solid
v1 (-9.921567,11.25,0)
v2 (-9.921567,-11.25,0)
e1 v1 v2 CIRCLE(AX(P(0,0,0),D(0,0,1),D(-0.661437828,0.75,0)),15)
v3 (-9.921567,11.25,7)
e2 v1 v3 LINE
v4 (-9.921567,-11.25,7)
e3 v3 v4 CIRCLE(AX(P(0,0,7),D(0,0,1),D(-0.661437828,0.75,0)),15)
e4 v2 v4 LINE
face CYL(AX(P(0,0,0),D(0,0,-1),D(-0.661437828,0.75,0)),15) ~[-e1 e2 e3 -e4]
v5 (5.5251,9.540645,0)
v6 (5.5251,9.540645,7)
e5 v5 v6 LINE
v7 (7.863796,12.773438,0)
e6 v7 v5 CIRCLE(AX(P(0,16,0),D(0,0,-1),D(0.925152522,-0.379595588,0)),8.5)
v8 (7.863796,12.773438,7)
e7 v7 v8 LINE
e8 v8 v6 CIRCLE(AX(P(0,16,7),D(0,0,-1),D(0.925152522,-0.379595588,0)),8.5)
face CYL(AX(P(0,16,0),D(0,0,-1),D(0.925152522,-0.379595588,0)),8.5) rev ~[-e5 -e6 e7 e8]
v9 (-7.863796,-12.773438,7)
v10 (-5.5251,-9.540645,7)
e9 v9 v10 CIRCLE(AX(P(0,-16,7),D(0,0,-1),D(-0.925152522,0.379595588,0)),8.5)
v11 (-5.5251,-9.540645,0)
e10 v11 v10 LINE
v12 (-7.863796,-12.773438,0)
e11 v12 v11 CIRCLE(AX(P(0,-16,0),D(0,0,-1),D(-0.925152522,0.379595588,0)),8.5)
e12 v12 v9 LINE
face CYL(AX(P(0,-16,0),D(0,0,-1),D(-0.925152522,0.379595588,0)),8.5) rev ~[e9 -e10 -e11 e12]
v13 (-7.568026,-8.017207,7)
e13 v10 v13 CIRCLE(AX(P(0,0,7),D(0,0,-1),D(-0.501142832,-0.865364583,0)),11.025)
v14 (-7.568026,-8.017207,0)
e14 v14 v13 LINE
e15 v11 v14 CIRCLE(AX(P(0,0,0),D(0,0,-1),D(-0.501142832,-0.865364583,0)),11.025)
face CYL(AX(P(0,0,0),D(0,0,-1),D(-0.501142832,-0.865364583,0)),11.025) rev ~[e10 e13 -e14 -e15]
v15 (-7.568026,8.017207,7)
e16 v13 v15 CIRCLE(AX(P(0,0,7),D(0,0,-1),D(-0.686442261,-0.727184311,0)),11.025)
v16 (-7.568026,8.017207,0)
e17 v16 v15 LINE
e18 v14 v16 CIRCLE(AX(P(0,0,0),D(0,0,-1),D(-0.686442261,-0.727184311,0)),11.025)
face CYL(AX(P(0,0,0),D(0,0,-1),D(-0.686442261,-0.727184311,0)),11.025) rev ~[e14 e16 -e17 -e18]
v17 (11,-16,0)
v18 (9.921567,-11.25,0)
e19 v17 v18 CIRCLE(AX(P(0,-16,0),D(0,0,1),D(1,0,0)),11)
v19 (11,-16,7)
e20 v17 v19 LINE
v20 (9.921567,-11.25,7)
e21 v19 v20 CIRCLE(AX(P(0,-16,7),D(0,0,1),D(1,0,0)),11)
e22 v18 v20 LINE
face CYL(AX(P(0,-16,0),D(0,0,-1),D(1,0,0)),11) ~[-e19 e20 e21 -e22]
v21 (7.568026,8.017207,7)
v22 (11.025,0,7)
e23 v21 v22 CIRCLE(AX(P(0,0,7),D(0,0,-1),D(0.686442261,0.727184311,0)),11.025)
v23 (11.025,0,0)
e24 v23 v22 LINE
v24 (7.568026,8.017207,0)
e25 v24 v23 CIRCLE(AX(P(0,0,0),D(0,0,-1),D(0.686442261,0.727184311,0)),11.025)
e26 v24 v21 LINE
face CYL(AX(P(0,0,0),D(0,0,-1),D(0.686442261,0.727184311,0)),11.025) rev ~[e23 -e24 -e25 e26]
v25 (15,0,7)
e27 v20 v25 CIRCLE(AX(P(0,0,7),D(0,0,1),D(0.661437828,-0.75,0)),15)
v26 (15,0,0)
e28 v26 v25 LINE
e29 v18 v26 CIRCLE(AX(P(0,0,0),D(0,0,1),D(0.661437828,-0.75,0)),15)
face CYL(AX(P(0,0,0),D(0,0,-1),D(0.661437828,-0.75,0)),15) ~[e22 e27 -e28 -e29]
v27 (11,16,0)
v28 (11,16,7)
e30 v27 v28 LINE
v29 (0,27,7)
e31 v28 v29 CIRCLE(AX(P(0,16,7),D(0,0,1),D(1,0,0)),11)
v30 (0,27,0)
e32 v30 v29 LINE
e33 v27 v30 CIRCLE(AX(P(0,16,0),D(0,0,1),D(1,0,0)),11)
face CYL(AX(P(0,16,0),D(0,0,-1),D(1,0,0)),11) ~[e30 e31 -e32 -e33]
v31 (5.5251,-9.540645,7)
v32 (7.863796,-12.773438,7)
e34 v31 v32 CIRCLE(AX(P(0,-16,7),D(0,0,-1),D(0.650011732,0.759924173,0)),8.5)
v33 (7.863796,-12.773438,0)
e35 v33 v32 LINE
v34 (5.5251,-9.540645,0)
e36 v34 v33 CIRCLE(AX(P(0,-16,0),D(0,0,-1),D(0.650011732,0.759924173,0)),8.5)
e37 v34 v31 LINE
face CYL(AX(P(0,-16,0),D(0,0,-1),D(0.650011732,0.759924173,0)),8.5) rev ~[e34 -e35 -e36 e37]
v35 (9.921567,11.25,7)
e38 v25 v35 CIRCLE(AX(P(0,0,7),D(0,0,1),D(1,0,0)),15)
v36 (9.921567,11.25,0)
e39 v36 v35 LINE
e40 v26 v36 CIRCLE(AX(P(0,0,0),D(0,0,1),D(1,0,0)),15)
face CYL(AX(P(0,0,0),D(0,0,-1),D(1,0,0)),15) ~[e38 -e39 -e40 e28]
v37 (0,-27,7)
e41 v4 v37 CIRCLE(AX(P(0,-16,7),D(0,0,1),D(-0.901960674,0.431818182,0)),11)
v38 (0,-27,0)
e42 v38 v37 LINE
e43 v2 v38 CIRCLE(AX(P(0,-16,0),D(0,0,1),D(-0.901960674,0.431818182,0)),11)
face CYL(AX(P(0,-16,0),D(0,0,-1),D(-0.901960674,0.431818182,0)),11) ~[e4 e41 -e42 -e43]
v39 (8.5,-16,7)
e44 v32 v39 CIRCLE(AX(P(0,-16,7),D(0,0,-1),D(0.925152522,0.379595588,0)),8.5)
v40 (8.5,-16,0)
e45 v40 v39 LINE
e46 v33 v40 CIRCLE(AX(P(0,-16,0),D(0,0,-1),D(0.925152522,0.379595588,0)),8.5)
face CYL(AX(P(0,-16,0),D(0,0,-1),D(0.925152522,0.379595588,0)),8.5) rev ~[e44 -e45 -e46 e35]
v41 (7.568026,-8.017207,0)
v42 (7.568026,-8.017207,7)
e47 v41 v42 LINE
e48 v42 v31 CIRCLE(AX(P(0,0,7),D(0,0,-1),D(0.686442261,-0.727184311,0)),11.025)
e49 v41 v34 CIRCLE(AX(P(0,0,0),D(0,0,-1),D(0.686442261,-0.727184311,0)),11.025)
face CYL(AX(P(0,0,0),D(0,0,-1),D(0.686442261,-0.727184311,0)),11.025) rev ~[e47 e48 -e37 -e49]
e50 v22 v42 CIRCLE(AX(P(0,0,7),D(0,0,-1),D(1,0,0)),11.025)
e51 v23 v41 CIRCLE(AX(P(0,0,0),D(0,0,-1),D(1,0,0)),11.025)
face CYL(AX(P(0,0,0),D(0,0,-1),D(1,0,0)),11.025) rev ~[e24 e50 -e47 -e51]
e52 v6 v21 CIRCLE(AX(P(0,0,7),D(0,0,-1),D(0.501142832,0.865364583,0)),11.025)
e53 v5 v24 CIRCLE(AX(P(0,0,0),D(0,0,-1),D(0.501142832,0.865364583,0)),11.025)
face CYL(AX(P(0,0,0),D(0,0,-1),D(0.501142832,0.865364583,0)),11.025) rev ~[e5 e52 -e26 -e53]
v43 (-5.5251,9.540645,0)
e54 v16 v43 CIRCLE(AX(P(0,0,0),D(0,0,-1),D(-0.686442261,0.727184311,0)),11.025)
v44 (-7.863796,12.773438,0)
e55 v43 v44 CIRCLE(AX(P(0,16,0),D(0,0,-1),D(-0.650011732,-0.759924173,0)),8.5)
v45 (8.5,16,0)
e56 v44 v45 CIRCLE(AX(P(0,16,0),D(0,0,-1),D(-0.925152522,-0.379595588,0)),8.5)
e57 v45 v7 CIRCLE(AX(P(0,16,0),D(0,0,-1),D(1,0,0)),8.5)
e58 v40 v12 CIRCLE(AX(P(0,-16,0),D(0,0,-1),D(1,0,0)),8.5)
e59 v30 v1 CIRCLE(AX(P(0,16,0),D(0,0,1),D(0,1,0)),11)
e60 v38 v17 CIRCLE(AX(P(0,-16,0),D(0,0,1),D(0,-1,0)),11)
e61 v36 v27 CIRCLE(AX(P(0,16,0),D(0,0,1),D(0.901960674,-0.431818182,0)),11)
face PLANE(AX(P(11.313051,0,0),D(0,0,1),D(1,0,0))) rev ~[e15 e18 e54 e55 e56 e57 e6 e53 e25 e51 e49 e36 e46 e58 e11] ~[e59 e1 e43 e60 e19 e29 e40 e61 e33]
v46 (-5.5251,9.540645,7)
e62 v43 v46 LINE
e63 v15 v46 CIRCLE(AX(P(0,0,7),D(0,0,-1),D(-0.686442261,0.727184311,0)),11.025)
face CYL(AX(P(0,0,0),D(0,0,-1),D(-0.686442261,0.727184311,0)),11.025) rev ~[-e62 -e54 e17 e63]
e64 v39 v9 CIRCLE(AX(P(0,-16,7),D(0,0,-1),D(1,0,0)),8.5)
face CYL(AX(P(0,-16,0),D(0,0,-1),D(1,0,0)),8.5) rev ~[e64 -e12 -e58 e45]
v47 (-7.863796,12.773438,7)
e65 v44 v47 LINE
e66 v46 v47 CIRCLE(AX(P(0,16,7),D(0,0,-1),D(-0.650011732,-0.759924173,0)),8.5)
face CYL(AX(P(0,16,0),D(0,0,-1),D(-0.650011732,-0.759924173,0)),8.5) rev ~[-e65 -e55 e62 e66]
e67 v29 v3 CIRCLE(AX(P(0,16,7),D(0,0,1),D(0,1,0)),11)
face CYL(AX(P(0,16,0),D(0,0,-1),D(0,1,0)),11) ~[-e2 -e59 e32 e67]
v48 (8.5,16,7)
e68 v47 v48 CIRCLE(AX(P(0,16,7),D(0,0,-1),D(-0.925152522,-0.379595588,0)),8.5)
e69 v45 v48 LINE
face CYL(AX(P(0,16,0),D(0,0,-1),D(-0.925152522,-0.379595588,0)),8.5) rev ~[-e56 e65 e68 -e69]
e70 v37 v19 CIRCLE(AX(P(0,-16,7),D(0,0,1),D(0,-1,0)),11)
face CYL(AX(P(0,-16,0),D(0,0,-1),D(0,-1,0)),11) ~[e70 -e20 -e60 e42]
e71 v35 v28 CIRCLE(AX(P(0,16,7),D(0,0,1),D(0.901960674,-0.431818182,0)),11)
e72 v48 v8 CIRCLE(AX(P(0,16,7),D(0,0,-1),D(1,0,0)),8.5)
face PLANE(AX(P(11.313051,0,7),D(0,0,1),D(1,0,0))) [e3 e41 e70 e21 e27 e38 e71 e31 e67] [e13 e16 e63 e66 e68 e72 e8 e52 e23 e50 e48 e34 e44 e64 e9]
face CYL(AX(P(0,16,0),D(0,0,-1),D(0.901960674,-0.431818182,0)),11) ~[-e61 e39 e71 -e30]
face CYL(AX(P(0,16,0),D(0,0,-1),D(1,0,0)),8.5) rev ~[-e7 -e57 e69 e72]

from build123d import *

# Parameters (mm, degrees)
F1_DEPTH = 7


with BuildPart() as f1:
    # F0 (on Top) → F1 (new body)
    with BuildSketch(Plane.XY):
        with BuildLine():
            ThreePointArc((7.5680259261, 8.0172070312), (10.1239347794, 4.3653830969), (11.025, 0))
            ThreePointArc((11.025, 0), (10.1239347794, -4.3653830969), (7.5680259261, -8.0172070312))
            ThreePointArc((7.5680259261, -8.0172070313), (8.8929301367, -9.5257592273), (9.9215674165, -11.25))
            ThreePointArc((9.9215674165, -11.25), (13.6715674165, -6.1715674165), (15, 0))
            ThreePointArc((15, 0), (13.6715674165, 6.1715674165), (9.9215674165, 11.25))
            ThreePointArc((9.9215674165, 11.25), (8.8929301367, 9.5257592273), (7.5680259261, 8.0172070312))
        make_face()
        with BuildLine():
            ThreePointArc((5.5250997211, 9.5406445313), (6.5907283556, 8.8381516587), (7.5680259261, 8.0172070312))
            ThreePointArc((7.5680259261, 8.0172070312), (8.8929301367, 9.5257592273), (9.9215674165, 11.25))
            ThreePointArc((9.9215674165, 11.25), (8.9252455049, 12.0557037405), (7.863796439, 12.7734375))
            ThreePointArc((7.863796439, 12.7734375), (6.8868260245, 11.0178691999), (5.5250997211, 9.5406445312))
        make_face()
        with BuildLine():
            ThreePointArc((9.9215674165, -11.25), (8.8929301367, -9.5257592273), (7.5680259261, -8.0172070313))
            ThreePointArc((7.5680259261, -8.0172070312), (6.5907283556, -8.8381516587), (5.5250997211, -9.5406445313))
            ThreePointArc((5.5250997211, -9.5406445312), (6.8868260245, -11.0178691999), (7.863796439, -12.7734375))
            ThreePointArc((7.863796439, -12.7734375), (8.9252455049, -12.0557037405), (9.9215674165, -11.25))
        make_face()
        with BuildLine():
            ThreePointArc((7.863796439, 12.7734375), (8.9252455049, 12.0557037405), (9.9215674165, 11.25))
            ThreePointArc((9.9215674165, 11.25), (10.7270042785, 13.5645576974), (11, 16))
            ThreePointArc((11, 16), (7.7781745931, 23.7781745931), (0, 27))
            Line((0, 27), (0, 24.5))
            ThreePointArc((0, 24.5), (6.0104076401, 22.0104076401), (8.5, 16))
            ThreePointArc((8.5, 16), (8.3394325266, 14.3556566252), (7.863796439, 12.7734375))
        make_face()
        with BuildLine():
            ThreePointArc((11, -16), (10.7270042785, -13.5645576974), (9.9215674165, -11.25))
            ThreePointArc((9.9215674165, -11.25), (8.9252455049, -12.0557037405), (7.863796439, -12.7734375))
            ThreePointArc((7.863796439, -12.7734375), (8.3394325266, -14.3556566252), (8.5, -16))
            ThreePointArc((8.5, -16), (6.0104076401, -22.0104076401), (0, -24.5))
            Line((0, -24.5), (0, -27))
            ThreePointArc((0, -27), (7.7781745931, -23.7781745931), (11, -16))
        make_face()
        with BuildLine():
            ThreePointArc((-9.9215674165, 11.25), (-8.8929301367, 9.5257592273), (-7.5680259261, 8.0172070313))
            ThreePointArc((-7.5680259261, 8.0172070312), (-6.5907283556, 8.8381516587), (-5.5250997211, 9.5406445313))
            ThreePointArc((-5.5250997211, 9.5406445312), (-6.8868260245, 11.0178691999), (-7.863796439, 12.7734375))
            ThreePointArc((-7.863796439, 12.7734375), (-8.9252455049, 12.0557037405), (-9.9215674165, 11.25))
        make_face()
        with BuildLine():
            ThreePointArc((-7.5680259261, -8.0172070312), (-11.025, 0), (-7.5680259261, 8.0172070312))
            ThreePointArc((-7.5680259261, 8.0172070313), (-8.8929301367, 9.5257592273), (-9.9215674165, 11.25))
            ThreePointArc((-9.9215674165, 11.25), (-15, 0), (-9.9215674165, -11.25))
            ThreePointArc((-9.9215674165, -11.25), (-8.8929301367, -9.5257592273), (-7.5680259261, -8.0172070313))
        make_face()
        with BuildLine():
            ThreePointArc((-5.5250997211, -9.5406445313), (-6.5907283556, -8.8381516587), (-7.5680259261, -8.0172070312))
            ThreePointArc((-7.5680259261, -8.0172070313), (-8.8929301367, -9.5257592273), (-9.9215674165, -11.25))
            ThreePointArc((-9.9215674165, -11.25), (-8.9252455049, -12.0557037405), (-7.863796439, -12.7734375))
            ThreePointArc((-7.863796439, -12.7734375), (-6.8868260245, -11.0178691999), (-5.5250997211, -9.5406445312))
        make_face()
        with BuildLine():
            ThreePointArc((0, 27), (-9.3072552345, 21.8630196998), (-9.9215674165, 11.25))
            ThreePointArc((-9.9215674165, 11.25), (-8.9252455049, 12.0557037405), (-7.863796439, 12.7734375))
            ThreePointArc((-7.863796439, 12.7734375), (-7.0595956417, 20.7341429399), (0, 24.5))
            Line((0, 24.5), (0, 27))
        make_face()
        with BuildLine():
            ThreePointArc((-9.9215674165, -11.25), (-9.3072552345, -21.8630196998), (0, -27))
            Line((0, -27), (0, -24.5))
            ThreePointArc((0, -24.5), (-7.0595956417, -20.7341429399), (-7.863796439, -12.7734375))
            ThreePointArc((-7.863796439, -12.7734375), (-8.9252455049, -12.0557037405), (-9.9215674165, -11.25))
        make_face()
    extrude(amount=F1_DEPTH)


solid = f1.part
